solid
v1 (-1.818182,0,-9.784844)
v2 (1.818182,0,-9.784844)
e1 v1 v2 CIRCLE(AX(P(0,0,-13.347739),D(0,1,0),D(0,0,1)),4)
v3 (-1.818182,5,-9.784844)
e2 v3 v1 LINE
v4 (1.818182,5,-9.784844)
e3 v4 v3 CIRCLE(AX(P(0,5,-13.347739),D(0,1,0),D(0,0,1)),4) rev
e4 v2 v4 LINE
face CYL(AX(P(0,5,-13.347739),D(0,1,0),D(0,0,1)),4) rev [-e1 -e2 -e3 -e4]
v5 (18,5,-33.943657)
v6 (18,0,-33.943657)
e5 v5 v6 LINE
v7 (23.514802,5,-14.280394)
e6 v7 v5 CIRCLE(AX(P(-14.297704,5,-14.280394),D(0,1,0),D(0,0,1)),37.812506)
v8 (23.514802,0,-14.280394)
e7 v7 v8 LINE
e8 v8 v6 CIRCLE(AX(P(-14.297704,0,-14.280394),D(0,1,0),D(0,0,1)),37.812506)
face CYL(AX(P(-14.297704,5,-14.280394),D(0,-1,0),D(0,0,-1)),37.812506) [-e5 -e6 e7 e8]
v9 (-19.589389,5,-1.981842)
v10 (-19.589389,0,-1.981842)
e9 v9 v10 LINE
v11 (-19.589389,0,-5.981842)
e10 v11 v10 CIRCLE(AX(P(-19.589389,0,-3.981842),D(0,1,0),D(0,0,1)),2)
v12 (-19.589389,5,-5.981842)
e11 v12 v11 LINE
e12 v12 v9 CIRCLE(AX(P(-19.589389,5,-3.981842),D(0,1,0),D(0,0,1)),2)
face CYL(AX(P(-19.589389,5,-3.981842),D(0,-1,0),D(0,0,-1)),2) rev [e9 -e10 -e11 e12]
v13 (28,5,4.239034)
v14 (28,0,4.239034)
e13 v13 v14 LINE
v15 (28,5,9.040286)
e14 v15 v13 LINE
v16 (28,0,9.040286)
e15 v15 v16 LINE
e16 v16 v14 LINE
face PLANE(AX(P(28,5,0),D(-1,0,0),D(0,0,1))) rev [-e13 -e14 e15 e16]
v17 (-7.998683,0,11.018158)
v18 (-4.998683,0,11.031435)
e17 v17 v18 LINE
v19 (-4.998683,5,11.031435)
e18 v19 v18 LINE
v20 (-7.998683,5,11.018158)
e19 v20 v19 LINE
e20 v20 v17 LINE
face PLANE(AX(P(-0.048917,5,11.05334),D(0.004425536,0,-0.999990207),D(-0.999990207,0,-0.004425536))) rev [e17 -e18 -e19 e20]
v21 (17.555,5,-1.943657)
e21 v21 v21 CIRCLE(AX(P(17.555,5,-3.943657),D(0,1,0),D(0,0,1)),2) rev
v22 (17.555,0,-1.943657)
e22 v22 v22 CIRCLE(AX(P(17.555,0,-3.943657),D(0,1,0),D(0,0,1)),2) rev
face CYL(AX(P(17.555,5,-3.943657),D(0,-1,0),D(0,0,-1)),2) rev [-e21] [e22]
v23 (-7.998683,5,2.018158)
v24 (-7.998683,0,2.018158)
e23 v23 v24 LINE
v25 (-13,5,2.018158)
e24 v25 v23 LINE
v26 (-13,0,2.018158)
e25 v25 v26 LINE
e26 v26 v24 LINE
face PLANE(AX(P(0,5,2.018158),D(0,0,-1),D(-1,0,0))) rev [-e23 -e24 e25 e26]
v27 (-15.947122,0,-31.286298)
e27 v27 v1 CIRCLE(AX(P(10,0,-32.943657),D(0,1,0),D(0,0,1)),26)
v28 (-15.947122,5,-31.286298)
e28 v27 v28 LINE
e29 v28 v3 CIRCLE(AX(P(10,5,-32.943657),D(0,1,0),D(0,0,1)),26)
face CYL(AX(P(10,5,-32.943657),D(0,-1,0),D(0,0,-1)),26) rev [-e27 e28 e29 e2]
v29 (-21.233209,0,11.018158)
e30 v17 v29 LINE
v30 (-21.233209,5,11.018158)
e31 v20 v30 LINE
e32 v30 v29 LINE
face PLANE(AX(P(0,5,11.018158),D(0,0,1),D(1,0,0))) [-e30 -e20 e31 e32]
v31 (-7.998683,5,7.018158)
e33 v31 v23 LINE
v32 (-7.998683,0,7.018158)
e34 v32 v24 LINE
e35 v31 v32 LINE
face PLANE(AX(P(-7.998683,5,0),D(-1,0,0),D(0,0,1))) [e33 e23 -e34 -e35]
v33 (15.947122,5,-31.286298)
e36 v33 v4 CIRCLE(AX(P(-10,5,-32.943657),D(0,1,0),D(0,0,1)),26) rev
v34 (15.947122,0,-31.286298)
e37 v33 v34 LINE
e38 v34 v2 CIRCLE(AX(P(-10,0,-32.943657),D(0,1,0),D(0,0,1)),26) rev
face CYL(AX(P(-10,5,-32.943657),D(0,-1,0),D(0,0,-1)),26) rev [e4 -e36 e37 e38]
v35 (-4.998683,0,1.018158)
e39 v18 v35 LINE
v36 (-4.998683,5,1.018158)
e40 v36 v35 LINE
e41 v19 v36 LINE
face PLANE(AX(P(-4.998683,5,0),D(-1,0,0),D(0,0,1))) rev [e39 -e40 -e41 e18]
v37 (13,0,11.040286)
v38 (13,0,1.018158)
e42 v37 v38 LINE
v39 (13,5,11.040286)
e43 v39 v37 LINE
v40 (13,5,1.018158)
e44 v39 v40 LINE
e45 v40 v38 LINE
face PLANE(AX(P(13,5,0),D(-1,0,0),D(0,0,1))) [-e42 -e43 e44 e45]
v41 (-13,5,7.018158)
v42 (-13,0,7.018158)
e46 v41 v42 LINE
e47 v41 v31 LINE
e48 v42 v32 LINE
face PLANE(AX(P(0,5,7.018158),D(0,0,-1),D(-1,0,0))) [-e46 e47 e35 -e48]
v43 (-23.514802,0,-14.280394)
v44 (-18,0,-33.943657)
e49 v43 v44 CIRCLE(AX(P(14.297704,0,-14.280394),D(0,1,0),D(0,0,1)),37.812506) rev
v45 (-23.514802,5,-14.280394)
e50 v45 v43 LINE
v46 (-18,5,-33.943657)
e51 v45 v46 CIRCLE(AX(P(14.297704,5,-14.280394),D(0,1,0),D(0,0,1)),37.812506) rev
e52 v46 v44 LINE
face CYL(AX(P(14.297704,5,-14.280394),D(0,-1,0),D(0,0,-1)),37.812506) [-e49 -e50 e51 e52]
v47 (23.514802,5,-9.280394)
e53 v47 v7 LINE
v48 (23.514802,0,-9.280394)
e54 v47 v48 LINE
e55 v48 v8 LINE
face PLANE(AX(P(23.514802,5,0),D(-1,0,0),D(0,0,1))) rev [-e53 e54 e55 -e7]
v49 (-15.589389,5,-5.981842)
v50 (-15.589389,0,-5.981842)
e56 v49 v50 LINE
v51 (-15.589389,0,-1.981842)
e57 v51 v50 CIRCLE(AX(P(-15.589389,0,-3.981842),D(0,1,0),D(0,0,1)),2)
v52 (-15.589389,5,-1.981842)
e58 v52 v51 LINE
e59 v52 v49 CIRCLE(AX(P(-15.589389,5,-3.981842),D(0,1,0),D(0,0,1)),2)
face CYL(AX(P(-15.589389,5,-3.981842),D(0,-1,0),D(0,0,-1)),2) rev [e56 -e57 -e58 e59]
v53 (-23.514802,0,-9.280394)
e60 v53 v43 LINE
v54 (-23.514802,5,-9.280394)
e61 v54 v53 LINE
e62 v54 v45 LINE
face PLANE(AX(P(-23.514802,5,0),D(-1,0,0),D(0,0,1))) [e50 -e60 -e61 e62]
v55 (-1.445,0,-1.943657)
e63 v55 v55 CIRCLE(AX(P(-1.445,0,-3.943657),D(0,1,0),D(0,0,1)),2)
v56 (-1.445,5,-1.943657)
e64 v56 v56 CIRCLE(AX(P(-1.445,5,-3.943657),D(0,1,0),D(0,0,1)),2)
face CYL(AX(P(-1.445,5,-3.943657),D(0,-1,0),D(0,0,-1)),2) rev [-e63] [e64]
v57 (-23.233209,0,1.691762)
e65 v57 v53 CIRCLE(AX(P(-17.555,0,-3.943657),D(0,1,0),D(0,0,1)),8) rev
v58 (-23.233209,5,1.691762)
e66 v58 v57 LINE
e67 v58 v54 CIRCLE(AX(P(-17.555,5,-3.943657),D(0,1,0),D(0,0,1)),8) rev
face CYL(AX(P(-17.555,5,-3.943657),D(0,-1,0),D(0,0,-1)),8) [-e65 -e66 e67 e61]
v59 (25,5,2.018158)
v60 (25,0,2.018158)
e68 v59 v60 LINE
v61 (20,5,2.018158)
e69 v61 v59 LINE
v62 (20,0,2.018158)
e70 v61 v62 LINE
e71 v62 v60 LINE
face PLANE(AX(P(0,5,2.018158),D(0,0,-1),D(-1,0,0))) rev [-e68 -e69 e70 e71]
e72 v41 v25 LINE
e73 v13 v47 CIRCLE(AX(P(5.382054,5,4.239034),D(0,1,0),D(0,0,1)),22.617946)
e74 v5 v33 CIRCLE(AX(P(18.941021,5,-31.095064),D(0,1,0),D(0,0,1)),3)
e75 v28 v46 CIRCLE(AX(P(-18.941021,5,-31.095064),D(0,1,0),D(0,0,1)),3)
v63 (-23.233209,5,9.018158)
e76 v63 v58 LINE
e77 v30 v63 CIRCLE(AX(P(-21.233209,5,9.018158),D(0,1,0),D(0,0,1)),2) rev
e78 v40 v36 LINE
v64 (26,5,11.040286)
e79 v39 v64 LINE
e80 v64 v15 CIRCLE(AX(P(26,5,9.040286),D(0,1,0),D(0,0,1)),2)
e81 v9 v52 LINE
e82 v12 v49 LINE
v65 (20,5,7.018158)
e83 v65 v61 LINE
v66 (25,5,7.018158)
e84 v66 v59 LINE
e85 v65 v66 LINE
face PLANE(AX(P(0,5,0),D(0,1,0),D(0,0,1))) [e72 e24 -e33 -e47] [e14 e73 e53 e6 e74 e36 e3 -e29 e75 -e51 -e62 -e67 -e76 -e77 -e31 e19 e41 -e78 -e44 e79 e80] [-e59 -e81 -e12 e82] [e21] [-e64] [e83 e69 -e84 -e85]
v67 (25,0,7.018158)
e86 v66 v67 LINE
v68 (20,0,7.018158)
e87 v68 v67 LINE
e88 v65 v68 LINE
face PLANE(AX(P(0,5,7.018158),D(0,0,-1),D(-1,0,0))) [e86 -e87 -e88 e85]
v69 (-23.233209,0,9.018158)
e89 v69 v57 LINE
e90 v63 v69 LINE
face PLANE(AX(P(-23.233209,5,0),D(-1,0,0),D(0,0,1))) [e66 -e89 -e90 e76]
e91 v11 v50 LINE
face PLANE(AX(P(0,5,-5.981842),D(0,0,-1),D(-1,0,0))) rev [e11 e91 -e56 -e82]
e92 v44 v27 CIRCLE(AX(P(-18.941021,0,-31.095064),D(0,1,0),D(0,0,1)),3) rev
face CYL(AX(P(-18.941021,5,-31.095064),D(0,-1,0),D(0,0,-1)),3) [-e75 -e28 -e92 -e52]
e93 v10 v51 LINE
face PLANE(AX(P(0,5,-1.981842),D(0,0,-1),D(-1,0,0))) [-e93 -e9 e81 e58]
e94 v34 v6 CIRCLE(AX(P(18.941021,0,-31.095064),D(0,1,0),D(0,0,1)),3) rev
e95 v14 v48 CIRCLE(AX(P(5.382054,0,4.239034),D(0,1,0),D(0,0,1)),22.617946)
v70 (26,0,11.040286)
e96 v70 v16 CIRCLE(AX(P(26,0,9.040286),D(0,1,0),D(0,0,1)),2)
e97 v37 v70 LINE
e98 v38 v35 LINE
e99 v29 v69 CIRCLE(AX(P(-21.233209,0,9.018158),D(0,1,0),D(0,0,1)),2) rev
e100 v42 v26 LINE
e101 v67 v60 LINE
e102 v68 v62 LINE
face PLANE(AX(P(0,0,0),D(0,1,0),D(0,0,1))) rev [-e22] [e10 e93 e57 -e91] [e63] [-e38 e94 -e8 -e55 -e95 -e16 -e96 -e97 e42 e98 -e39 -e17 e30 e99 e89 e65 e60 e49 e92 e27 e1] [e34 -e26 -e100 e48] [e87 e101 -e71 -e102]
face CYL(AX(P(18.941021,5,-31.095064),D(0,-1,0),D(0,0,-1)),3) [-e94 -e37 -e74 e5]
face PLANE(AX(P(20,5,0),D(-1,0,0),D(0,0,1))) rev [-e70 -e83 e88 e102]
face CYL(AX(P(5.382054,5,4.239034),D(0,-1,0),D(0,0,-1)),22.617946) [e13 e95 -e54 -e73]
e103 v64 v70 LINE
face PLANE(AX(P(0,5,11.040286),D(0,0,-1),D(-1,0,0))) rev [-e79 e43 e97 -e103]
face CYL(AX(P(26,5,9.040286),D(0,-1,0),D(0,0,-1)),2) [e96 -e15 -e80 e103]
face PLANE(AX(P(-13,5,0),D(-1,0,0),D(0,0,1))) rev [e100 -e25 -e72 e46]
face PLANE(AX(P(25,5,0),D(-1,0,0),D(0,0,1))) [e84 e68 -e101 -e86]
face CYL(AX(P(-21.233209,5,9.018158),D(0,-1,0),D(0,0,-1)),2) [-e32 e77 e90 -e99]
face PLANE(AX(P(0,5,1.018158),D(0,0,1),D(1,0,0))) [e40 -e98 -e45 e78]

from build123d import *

# Parameters (mm, degrees)
SKETCH1_W           = 5.001317171
SKETCH1_H           = 5
SKETCH1_R           = 2
SKETCH1_W_2         = 5
BOSS_EXTRUDE1_DEPTH = 5
FILLET1_R           = 4
FILLET2_R           = 3
FILLET3_R           = 3


with BuildPart() as part:
    # Sketch1 → Boss-Extrude1 (new body)
    with BuildSketch(Plane(origin=(0, 0, 0), x_dir=(1, 0, 0), z_dir=(0, 1, 0))):
        with BuildLine():
            Line((18, 33.943656531), (16, 33.943656531))
            Line((16, 33.943656531), (16, 32.943656531))
            ThreePointArc((16, 32.943656531), (11.633307653, 18.521451429), (0, 8.943656531))
            ThreePointArc((0, 8.943656531), (-11.633307653, 18.521451429), (-16, 32.943656531))
            Line((-16, 32.943656531), (-16, 33.943656531))
            Line((-16, 33.943656531), (-18, 33.943656531))
            ThreePointArc((-18, 33.943656531), (-22.110006153, 24.491379681), (-23.514801823, 14.280393571))
            Line((-23.514801823, 14.280393571), (-23.514801823, 9.280393571))
            ThreePointArc((-23.514801823, 9.280393571), (-25.552366673, 3.738409631), (-23.233209016, -1.691762031))
            Line((-23.233209016, -1.691762031), (-23.233209016, -9.018158061))
            ThreePointArc((-23.233209016, -9.018158061), (-22.647422579, -10.432371623), (-21.233209016, -11.018158061))
            Line((-21.233209016, -11.018158061), (-13, -11.018158061))
            Line((-13, -11.018158061), (-7.998682829, -11.018158061))
            Line((-7.998682829, -11.018158061), (-4.998682829, -11.0314348))
            Line((-4.998682829, -11.0314348), (-4.998682829, -1.018158061))
            Line((-4.998682829, -1.018158061), (-2.998682829, -1.018158061))
            Line((-2.998682829, -1.018158061), (13, -1.018158061))
            Line((13, -1.018158061), (13, -11.04028596))
            Line((13, -11.04028596), (26, -11.04028596))
            ThreePointArc((26, -11.04028596), (27.414213562, -10.454499522), (28, -9.04028596))
            Line((28, -9.04028596), (28, -4.239034491))
            ThreePointArc((28, -4.239034491), (26.849436145, 2.882972561), (23.514801823, 9.280393571))
            Line((23.514801823, 9.280393571), (23.514801823, 14.280393571))
            ThreePointArc((23.514801823, 14.280393571), (22.110006153, 24.491379681), (18, 33.943656531))
        make_face()
        with Locations((-10.499341414, -4.518158061)):
            Rectangle(SKETCH1_W, SKETCH1_H, mode=Mode.SUBTRACT)
        with BuildLine():
            ThreePointArc((-19.589388553, 1.981841939), (-21.589388553, 3.981841939), (-19.589388553, 5.981841939))
            Line((-19.589388553, 5.981841939), (-15.589388553, 5.981841939))
            ThreePointArc((-15.589388553, 5.981841939), (-13.589388553, 3.981841939), (-15.589388553, 1.981841939))
            Line((-15.589388553, 1.981841939), (-19.589388553, 1.981841939))
        make_face(mode=Mode.SUBTRACT)
        with Locations(Location((-1.445, 3.943656531, 0), (0, 0, 270))):
            Circle(SKETCH1_R, mode=Mode.SUBTRACT)
        with Locations((22.5, -4.518158061)):
            Rectangle(SKETCH1_W_2, SKETCH1_H, mode=Mode.SUBTRACT)
        with Locations(Location((17.555, 3.943656531, 0), (0, 0, 270))):
            Circle(SKETCH1_R, mode=Mode.SUBTRACT)
    extrude(amount=BOSS_EXTRUDE1_DEPTH)

    # Fillet1
    fillet1_edges = [part.edges().sort_by_distance(p)[0] for p in [
        (0, 2.5, -8.943656531),
    ]]
    fillet(fillet1_edges, radius=FILLET1_R)

    # Fillet2
    # the kernel refuses this fillet: 3 mm, written as the material it takes off along each edge
    with BuildSketch(Plane(origin=(16, -6.644712065, -33.943656531), x_dir=(-0.019894609369720543, 0, 0.999802082673379), z_dir=(0, 1, 0))) as fillet2_piece_1:
        with BuildLine():
            CenterArc((2.789518237, 2.997110716), FILLET2_R, 199.420718405, 68.064461233)
            Line((-0.039789219, 1.999604165), (-0.322719964, 1.89985351))
            ThreePointArc((-0.322719964, 1.89985351), (-0.319835234, 0.9938337), (-0.299940625, -0.005968383))
            Line((-0.299940625, -0.005968383), (0.005968383, -0.299940625))
            ThreePointArc((0.005968383, -0.299940625), (1.005770465, -0.280046015), (2.644721485, -0.299711072))
            Line((2.644721485, -0.299711072), (2.657884826, 0))
        make_face()
    extrude(amount=18.289424129, mode=Mode.SUBTRACT)

    # Fillet3
    # the kernel refuses this fillet: 3 mm, written as the material it takes off along each edge
    with BuildSketch(Plane(origin=(-16, -6.644712065, -33.943656531), x_dir=(-1, 0, 0), z_dir=(0, 1, 0))) as fillet3_piece_1:
        with BuildLine():
            CenterArc((2.94102116, 2.84859249), FILLET3_R, 183.654772721, 68.064461233)
            Line((-0.05287758, 2.657358784), (-0.352267454, 2.638235414))
            ThreePointArc((-0.352267454, 2.638235414), (-0.3, 1), (-0.3, 0))
            Line((-0.3, 0), (0, -0.3))
            ThreePointArc((0, -0.3), (1, -0.3), (1.905897884, -0.284859249))
            Line((1.905897884, -0.284859249), (2, 0))
        make_face()
    extrude(amount=18.289424129, mode=Mode.SUBTRACT)


solid = part.part
